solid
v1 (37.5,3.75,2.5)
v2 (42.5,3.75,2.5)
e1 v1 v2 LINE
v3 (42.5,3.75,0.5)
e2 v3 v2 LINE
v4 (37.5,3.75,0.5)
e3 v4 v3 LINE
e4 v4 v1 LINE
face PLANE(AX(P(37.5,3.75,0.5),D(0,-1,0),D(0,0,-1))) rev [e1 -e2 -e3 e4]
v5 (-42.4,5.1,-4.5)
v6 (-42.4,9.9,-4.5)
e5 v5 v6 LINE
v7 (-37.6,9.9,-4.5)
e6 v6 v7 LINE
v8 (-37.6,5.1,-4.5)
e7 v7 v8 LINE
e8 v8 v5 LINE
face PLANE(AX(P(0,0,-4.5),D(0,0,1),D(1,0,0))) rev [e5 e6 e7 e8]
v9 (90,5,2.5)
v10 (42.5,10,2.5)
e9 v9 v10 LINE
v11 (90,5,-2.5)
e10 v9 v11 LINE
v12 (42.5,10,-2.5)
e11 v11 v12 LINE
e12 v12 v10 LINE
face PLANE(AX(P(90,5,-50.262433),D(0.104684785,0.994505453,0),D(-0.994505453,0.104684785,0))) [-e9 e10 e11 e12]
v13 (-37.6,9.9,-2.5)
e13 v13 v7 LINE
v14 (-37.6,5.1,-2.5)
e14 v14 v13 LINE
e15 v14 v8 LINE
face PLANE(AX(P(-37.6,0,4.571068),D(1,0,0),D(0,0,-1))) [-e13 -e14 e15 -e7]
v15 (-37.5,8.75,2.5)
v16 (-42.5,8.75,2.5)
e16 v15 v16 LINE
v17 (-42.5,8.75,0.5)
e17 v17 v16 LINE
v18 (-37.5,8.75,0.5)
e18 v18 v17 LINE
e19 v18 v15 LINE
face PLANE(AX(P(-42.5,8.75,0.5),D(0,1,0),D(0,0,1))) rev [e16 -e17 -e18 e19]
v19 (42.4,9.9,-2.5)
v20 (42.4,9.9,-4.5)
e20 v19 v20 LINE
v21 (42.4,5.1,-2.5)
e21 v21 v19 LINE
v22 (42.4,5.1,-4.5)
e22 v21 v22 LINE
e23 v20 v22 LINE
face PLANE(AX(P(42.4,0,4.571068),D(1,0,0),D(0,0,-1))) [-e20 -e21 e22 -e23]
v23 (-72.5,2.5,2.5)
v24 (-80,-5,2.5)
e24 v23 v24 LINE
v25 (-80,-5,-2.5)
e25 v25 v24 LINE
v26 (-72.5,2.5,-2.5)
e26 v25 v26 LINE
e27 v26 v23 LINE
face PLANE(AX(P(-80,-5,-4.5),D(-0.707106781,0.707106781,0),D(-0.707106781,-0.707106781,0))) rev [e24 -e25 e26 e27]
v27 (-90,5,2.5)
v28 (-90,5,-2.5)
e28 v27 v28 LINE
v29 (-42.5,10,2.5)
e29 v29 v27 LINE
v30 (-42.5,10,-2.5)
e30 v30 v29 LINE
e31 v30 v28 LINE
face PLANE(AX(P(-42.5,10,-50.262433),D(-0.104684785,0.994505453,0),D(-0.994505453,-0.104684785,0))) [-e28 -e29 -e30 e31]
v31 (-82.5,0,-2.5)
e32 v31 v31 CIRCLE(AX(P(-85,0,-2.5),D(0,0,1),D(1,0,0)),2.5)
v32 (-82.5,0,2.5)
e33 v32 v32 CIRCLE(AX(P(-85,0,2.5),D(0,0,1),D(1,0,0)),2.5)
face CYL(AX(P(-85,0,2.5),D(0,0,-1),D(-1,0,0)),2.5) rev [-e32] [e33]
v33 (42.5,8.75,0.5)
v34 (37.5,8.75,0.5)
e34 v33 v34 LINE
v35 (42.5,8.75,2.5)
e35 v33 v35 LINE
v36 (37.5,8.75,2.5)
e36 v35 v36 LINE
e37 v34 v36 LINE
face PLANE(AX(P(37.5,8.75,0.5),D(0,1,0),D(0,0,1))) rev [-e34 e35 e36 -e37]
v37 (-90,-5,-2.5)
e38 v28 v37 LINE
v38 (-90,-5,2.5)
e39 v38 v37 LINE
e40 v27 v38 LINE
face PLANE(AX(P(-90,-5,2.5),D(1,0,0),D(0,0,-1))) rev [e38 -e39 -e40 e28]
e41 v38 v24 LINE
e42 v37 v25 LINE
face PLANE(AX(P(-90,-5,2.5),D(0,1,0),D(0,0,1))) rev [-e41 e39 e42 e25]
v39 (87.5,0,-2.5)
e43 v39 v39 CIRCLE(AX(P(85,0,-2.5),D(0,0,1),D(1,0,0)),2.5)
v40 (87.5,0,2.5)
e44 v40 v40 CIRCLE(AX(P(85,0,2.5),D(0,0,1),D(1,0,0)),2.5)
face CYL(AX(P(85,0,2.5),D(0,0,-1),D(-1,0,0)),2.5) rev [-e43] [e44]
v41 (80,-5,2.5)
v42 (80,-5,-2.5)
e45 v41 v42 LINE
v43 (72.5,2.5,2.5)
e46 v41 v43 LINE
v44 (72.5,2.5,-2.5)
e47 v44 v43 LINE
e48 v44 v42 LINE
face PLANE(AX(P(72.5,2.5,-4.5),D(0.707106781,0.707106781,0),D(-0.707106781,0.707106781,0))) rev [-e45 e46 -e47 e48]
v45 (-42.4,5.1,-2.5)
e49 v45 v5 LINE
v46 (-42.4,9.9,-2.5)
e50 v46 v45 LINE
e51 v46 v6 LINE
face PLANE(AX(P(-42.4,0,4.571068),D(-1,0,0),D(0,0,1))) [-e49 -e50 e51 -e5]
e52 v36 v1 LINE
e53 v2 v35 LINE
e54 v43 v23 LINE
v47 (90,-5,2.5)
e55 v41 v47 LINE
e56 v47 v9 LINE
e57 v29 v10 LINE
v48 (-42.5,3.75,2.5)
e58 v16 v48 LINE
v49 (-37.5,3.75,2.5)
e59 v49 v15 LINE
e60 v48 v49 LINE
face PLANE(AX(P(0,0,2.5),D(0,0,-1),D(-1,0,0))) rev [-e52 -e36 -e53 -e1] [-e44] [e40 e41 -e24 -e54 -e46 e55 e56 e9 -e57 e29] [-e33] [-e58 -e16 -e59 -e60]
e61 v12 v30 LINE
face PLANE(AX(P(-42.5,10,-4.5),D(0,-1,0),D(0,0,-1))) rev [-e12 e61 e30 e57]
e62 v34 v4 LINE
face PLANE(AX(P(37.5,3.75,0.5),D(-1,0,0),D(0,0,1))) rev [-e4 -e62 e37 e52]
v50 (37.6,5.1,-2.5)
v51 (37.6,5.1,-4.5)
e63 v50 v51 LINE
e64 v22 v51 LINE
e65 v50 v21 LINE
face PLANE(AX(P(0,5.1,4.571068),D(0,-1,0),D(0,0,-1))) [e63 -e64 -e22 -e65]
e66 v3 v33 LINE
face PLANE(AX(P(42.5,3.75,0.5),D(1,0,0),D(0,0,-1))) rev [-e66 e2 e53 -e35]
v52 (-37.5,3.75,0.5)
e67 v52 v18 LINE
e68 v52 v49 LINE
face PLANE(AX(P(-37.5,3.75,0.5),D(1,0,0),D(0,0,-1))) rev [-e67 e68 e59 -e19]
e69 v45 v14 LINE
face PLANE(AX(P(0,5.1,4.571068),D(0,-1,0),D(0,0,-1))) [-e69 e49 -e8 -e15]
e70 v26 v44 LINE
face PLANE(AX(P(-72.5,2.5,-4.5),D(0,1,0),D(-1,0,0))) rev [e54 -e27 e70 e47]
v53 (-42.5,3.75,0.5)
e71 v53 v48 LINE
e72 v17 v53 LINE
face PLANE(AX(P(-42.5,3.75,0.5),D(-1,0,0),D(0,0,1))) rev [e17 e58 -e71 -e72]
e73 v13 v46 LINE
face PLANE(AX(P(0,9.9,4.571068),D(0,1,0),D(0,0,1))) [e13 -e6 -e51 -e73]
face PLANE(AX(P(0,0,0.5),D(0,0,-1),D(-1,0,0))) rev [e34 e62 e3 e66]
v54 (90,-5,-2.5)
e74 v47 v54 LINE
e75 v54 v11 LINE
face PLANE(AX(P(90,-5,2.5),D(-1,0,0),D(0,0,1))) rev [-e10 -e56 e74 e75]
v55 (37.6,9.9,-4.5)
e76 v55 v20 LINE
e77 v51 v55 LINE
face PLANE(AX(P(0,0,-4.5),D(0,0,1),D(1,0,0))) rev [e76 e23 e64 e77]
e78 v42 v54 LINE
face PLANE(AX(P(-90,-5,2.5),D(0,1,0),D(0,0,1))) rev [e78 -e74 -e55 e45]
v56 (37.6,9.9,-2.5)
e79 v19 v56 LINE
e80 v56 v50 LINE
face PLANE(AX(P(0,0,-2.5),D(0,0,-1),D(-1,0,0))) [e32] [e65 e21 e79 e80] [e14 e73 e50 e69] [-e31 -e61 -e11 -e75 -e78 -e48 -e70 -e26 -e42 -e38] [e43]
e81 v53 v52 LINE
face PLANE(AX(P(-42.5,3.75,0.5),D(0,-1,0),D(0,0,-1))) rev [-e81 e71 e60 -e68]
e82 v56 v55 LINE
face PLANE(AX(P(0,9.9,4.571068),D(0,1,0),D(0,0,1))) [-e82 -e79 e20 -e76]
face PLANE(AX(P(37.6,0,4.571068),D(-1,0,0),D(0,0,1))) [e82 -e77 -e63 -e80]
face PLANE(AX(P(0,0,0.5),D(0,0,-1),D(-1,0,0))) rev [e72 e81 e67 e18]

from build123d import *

# Parameters (mm, degrees)
SKETCH2_W           = 180
SKETCH2_H           = 10
SKETCH2_R           = 2.5
BOSS_EXTRUDE1_DEPTH = 2.5
SKETCH3_W           = 5
SKETCH3_H           = 5
BOSS_EXTRUDE2_DEPTH = 7
CHAMFER1_SIZE       = 5
SKETCH4_W           = 5
SKETCH4_H           = 5
SKETCH4_W_2         = 4.8
SKETCH4_H_2         = 4.8
CUT_EXTRUDE1_DEPTH  = 2
CUT_EXTRUDE2_DEPTH  = 91.824005637
BOSS_EXTRUDE3_DEPTH = 5
BOSS_EXTRUDE4_DEPTH = 5
SKETCH8_W           = 5
SKETCH8_H           = 5
CUT_EXTRUDE3_DEPTH  = 2


with BuildPart() as part:
    # Sketch2 → Boss-Extrude1 (new, symmetric)
    with BuildSketch(Plane.XY):
        Rectangle(SKETCH2_W, SKETCH2_H)
        with Locations((-85, 0)):
            Circle(SKETCH2_R, mode=Mode.SUBTRACT)
        with Locations((85, 0)):
            Circle(SKETCH2_R, mode=Mode.SUBTRACT)
    extrude(amount=BOSS_EXTRUDE1_DEPTH, both=True)

    # Sketch3 → Boss-Extrude2 (add)
    with BuildSketch(Plane.XY.offset(2.5)):
        with Locations((-40, 7.5)):
            Rectangle(SKETCH3_W, SKETCH3_H)
        with Locations((40, 7.5)):
            Rectangle(SKETCH3_W, SKETCH3_H)
    extrude(amount=-BOSS_EXTRUDE2_DEPTH)

    # Chamfer1
    chamfer1_edges = [part.edges().sort_by_distance(p)[0] for p in [
        (-37.5, 5, 0),
        (-42.5, 5, 0),
        (37.5, 5, 0),
        (42.5, 5, 0),
    ]]
    chamfer(chamfer1_edges, length=CHAMFER1_SIZE - 0.0001)  # a hair under: the kernel refuses the full size

    # Sketch4 → Cut-Extrude1 (cut)
    # profile 1 of 2: a face of its own
    with BuildSketch(Plane(origin=(0, 0, -4.5), x_dir=(-1, 0, 0), z_dir=(0, 0, -1))):
        with Locations((40, 7.5)):
            Rectangle(SKETCH4_W, SKETCH4_H)
        with Locations((40, 7.5)):
            Rectangle(SKETCH4_W_2, SKETCH4_H_2, mode=Mode.SUBTRACT)
    # profile 2 of 2: a face of its own
    with BuildSketch(Plane(origin=(0, 0, -4.5), x_dir=(-1, 0, 0), z_dir=(0, 0, -1))):
        with Locations((-40, 7.5)):
            Rectangle(SKETCH4_W, SKETCH4_H)
        with Locations((-40, 7.5)):
            Rectangle(SKETCH4_W_2, SKETCH4_H_2, mode=Mode.SUBTRACT)
    extrude(amount=-CUT_EXTRUDE1_DEPTH, mode=Mode.SUBTRACT)

    # Sketch5 → Cut-Extrude2 (cut, through all)
    with BuildSketch(Plane.XY.offset(2.5)):
        Polygon((-80, -5), (-72.5, 2.5), (72.5, 2.5), (80, -5), align=None)
    extrude(amount=-CUT_EXTRUDE2_DEPTH, mode=Mode.SUBTRACT)

    # Sketch6 → Boss-Extrude3 (add)
    with BuildSketch(Plane.XY.offset(2.5)):
        Polygon((-42.5, 10), (-90, 5), (-47.5, 5), align=None)
        Polygon((42.5, 10), (47.5, 5), (90, 5), align=None)
    extrude(amount=-BOSS_EXTRUDE3_DEPTH)

    # Sketch7 → Boss-Extrude4 (add)
    with BuildSketch(Plane.XY.offset(2.5)):
        Polygon((-37.5, 10), (37.5, 10), (32.5, 5), (-32.5, 5), align=None)
    extrude(amount=-BOSS_EXTRUDE4_DEPTH)

    # Sketch8 → Cut-Extrude3 (cut)
    with BuildSketch(Plane.XY.offset(2.5)):
        with Locations((-40, 6.25)):
            Rectangle(SKETCH8_W, SKETCH8_H)
        with Locations((40, 6.25)):
            Rectangle(SKETCH8_W, SKETCH8_H)
    extrude(amount=-CUT_EXTRUDE3_DEPTH, mode=Mode.SUBTRACT)


solid = part.part
